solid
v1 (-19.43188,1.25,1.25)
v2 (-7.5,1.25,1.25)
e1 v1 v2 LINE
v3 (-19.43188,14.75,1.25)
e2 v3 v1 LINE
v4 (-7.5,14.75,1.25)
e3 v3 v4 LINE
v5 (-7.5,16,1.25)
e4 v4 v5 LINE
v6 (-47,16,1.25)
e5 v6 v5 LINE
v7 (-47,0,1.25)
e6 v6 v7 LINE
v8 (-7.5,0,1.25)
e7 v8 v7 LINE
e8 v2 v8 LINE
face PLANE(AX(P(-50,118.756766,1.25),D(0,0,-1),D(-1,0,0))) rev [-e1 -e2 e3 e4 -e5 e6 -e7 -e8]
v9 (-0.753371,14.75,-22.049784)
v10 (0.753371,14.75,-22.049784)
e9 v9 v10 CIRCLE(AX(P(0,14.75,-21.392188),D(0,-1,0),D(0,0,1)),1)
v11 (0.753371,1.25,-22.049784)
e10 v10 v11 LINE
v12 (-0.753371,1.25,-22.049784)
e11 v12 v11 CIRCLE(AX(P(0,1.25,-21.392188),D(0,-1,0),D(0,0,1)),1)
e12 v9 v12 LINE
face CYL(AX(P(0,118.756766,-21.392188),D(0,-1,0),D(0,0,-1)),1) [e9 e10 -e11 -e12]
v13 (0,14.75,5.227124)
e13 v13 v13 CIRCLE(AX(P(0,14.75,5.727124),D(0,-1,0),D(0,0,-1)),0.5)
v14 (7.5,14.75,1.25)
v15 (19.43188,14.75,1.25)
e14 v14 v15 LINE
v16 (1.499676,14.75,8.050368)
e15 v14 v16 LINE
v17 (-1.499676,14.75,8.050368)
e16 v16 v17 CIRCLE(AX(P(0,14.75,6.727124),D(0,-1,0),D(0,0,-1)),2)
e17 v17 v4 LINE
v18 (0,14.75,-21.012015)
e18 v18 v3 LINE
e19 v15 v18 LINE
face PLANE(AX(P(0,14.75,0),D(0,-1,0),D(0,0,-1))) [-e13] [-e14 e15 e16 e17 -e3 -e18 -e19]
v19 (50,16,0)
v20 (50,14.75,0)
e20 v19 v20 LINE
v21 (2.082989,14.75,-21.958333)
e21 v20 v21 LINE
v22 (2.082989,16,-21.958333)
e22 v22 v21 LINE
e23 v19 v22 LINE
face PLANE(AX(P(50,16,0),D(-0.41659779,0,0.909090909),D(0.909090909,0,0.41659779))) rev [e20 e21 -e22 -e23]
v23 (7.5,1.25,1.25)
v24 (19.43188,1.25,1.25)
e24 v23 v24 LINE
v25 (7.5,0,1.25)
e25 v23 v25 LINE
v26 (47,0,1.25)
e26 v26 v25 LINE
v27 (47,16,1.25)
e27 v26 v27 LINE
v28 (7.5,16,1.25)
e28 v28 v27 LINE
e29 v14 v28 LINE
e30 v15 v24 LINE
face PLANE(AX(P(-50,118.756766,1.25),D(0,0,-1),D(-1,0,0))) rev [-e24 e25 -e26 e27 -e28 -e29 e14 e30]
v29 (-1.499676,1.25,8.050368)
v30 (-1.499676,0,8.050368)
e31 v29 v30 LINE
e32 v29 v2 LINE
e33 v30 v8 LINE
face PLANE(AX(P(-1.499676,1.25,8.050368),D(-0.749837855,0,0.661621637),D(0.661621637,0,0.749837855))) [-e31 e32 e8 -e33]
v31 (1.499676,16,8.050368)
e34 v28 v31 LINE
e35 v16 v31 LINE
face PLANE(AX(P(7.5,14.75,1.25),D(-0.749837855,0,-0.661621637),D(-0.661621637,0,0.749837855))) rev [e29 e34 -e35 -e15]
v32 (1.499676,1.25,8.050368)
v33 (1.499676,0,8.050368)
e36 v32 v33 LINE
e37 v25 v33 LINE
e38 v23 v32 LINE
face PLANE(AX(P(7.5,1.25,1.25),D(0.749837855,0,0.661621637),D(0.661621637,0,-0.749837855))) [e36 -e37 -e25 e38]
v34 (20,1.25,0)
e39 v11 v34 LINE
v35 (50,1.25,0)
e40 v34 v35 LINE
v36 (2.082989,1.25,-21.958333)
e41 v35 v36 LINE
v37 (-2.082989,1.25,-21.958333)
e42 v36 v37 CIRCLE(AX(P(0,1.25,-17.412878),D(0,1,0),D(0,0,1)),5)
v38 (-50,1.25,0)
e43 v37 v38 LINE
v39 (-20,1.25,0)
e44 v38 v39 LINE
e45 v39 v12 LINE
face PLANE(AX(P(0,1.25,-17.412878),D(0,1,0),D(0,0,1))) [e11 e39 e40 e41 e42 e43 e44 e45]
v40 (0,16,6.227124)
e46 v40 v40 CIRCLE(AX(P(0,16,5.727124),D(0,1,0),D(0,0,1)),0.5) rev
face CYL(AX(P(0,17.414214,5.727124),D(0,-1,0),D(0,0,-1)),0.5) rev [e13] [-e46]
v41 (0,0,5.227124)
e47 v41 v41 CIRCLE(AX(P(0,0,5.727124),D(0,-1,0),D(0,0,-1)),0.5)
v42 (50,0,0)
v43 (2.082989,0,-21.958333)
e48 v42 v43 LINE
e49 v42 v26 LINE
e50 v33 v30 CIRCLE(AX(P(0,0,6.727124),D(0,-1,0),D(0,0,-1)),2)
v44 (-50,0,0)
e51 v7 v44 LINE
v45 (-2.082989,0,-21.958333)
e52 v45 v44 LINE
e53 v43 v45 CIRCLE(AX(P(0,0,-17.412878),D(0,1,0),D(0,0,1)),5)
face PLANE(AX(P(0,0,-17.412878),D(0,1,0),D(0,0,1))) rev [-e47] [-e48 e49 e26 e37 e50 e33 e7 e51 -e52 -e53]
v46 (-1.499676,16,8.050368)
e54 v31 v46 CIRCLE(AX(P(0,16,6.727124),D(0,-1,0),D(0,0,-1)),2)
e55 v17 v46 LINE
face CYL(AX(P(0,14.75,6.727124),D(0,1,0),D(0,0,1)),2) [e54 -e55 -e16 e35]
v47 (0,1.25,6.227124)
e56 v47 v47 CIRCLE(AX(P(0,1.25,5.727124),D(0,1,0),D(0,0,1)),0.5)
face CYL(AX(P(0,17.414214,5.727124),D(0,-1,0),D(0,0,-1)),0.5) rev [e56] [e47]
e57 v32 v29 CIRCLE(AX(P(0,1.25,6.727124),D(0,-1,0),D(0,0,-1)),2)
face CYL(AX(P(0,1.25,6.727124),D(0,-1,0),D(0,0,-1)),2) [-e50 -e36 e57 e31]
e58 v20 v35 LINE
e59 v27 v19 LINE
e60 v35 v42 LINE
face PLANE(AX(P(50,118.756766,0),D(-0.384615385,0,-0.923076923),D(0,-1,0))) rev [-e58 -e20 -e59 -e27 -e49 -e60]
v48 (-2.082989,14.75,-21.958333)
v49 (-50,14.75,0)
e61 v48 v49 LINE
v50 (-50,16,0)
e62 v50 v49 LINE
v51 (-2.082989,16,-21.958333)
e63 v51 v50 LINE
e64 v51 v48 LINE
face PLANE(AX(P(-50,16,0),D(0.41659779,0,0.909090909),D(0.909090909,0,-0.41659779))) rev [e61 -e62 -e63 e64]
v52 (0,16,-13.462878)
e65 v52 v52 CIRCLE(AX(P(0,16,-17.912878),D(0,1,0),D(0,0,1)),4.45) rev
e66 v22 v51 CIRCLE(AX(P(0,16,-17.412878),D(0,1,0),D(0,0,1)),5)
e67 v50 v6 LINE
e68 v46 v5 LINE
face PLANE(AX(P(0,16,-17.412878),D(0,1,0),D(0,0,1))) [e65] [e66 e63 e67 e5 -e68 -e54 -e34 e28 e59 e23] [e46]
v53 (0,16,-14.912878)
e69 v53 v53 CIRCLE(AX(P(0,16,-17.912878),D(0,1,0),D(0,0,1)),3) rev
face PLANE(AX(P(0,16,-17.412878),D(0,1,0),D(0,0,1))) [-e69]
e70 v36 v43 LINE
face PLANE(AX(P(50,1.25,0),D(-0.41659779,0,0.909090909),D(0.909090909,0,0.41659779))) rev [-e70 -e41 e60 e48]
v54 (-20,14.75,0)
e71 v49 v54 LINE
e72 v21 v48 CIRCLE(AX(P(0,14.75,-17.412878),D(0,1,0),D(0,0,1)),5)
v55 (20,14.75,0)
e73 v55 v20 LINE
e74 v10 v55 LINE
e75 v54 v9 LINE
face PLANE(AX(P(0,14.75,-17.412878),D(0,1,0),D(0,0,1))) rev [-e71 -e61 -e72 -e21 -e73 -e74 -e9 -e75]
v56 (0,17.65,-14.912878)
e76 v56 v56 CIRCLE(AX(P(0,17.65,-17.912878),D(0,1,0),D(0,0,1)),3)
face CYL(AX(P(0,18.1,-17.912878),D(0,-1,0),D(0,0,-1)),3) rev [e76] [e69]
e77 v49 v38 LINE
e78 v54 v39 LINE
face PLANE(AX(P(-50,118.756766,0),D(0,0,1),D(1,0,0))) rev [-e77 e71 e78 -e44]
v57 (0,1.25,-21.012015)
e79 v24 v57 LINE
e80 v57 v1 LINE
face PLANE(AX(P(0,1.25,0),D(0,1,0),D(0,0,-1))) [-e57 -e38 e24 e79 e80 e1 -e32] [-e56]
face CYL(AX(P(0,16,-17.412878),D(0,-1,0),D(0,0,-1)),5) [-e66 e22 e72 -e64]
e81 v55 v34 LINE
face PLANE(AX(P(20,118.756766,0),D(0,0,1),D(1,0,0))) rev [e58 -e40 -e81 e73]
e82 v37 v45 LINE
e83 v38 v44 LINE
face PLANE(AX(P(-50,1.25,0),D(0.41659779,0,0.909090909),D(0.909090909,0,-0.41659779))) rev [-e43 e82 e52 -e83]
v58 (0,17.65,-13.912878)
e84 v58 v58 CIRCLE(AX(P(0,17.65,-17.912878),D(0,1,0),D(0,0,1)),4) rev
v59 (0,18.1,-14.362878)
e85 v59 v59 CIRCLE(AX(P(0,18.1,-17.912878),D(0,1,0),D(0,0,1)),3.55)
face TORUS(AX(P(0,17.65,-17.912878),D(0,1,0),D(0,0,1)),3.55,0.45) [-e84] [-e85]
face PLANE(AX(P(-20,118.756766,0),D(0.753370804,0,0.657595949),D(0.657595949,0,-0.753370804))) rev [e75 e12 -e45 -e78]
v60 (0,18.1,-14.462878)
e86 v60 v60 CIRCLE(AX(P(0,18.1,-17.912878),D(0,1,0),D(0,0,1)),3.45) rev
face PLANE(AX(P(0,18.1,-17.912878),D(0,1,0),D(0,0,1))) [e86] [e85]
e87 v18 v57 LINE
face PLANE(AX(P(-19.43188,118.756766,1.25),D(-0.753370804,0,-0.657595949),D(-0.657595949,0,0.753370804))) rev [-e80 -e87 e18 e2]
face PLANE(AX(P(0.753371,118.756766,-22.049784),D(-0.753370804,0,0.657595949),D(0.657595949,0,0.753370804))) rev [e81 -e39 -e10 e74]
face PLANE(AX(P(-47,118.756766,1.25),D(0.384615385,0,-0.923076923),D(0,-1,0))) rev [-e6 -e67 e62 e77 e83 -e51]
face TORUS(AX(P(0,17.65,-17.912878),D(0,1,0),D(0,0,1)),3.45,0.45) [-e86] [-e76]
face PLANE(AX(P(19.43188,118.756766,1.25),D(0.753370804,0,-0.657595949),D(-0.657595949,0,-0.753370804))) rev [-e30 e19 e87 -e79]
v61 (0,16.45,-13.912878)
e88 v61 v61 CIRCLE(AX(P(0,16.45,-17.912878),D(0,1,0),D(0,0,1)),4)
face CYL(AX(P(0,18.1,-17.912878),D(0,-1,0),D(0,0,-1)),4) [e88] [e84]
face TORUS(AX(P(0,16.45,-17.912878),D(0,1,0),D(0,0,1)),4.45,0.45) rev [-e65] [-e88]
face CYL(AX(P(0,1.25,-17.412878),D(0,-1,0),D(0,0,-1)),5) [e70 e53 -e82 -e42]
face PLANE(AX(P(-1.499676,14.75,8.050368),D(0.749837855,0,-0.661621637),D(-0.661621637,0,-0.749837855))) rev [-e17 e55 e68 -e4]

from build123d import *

# Parameters (mm, degrees)
BOSS_EXTRUDE1_DEPTH          = 1.25
BOSS_EXTRUDE8_START          = -8
BOSS_EXTRUDE8_DEPTH          = 16
CHAMFER2_SIZE2               = 3
CHAMFER2_SIZE                = 1.25
CHAMFER3_SIZE2               = 3
CHAMFER3_SIZE                = 1.25
BOSS_EXTRUDE9_DEPTH          = 1.25
BOSS_EXTRUDE10_DEPTH         = 1.25
CUT_EXTRUDE1_REACH           = 59.082
SKETCH6_R                    = 0.5
SCHIZZO1_R                   = 4
SCHIZZO1_R_2                 = 3
ESTRUSIONE_ESTRUSIONE1_DEPTH = 2.1
RACCORDO1_R                  = 0.45


with BuildPart() as part:
    # Sketch1 → Boss-Extrude1 (new body)
    with BuildSketch(Plane(origin=(0, 0, 0), x_dir=(1, 0, 0), z_dir=(0, 1, 0))):
        with BuildLine():
            Line((-50, 0), (-2.082988952, 21.95833302))
            ThreePointArc((-2.082988952, 21.95833302), (0, 22.412878475), (2.082988952, 21.95833302))
            Line((2.082988952, 21.95833302), (50, 0))
            Line((50, 0), (20, 0))
            Line((20, 0), (0.753370804, 22.049783791))
            ThreePointArc((0.753370804, 22.049783791), (0, 22.392187842), (-0.753370804, 22.049783791))
            Line((-0.753370804, 22.049783791), (-20, 0))
            Line((-20, 0), (-50, 0))
        make_face()
    extrude(amount=BOSS_EXTRUDE1_DEPTH)


with BuildPart() as body_2:
    # Body-Move/Copy1: copy of part
    add(part.part.moved(Location((0, 14.75, 0))))


with BuildPart() as part_1:
    add(part.part)

    add(body_2.part)  # Boss-Extrude8 merges body 2
    # Sketch3 → Boss-Extrude8 (add)
    with BuildSketch(Plane(origin=(0, 8, 0), x_dir=(1, 0, 0), z_dir=(0, 1, 0)).offset(BOSS_EXTRUDE8_START)):
        with BuildLine():
            Line((19.431879943, -1.25), (0, 21.012015184))
            Line((0, 21.012015184), (-19.431879943, -1.25))
            Line((-19.431879943, -1.25), (-50, -1.25))
            Line((-50, -1.25), (-50, 0))
            Line((-50, 0), (-20, 0))
            Line((-20, 0), (-0.753370804, 22.049783791))
            ThreePointArc((-0.753370804, 22.049783791), (0, 22.392187842), (0.753370804, 22.049783791))
            Line((0.753370804, 22.049783791), (20, 0))
            Line((20, 0), (50, 0))
            Line((50, 0), (50, -1.25))
            Line((50, -1.25), (19.431879943, -1.25))
        make_face()
    extrude(amount=BOSS_EXTRUDE8_DEPTH)

    # Chamfer2
    chamfer2_edges = [part_1.edges().sort_by_distance(p)[0] for p in [
        (50, 8, 1.25),
    ]]
    chamfer2_side = [part_1.faces().sort_by_distance(p)[0] for p in [
        (50, 8, 1.225),
    ]]
    chamfer(chamfer2_edges, length=CHAMFER2_SIZE - 0.0001, length2=CHAMFER2_SIZE2 - 0.0001, reference=chamfer2_side[0])  # a hair under: the kernel refuses the full size

    # Chamfer3
    chamfer3_edges = [part_1.edges().sort_by_distance(p)[0] for p in [
        (-50, 8, 1.25),
    ]]
    chamfer3_side = [part_1.faces().sort_by_distance(p)[0] for p in [
        (-50, 8, 1.225),
    ]]
    chamfer(chamfer3_edges, length=CHAMFER3_SIZE - 0.0001, length2=CHAMFER3_SIZE2 - 0.0001, reference=chamfer3_side[0])  # a hair under: the kernel refuses the full size

    # Sketch4 → Boss-Extrude9 (add)
    with BuildSketch(Plane(origin=(0, 16, 0), x_dir=(1, 0, 0), z_dir=(0, 1, 0))):
        Polygon((-19.431879943, -1.25), (0, 21.012015184), (19.431879943, -1.25), align=None)
    boss_extrude9 = extrude(amount=-BOSS_EXTRUDE9_DEPTH)

    # Mirror1: Boss-Extrude9 across plane
    add(boss_extrude9.mirror(Plane.ZX.offset(8)))

    # Sketch5 → Boss-Extrude10 (add)
    with BuildSketch(Plane.XZ):
        with BuildLine():
            Line((-7.5, 1.25), (7.5, 1.25))
            Line((7.5, 1.25), (1.499675711, 8.050367528))
            ThreePointArc((1.499675711, 8.050367528), (0, 8.727124254), (-1.499675711, 8.050367528))
            Line((-1.499675711, 8.050367528), (-7.5, 1.25))
        make_face()
    boss_extrude10 = extrude(amount=-BOSS_EXTRUDE10_DEPTH)

    # Mirror2: Boss-Extrude10 across plane
    add(boss_extrude10.mirror(Plane.ZX.offset(8)))

    # Sketch6 → Cut-Extrude1 (cut, up to next)
    with BuildSketch(Plane(origin=(0, 0, 0), x_dir=(-1, 0, 0), z_dir=(0, -1, 0)), mode=Mode.PRIVATE) as cut_extrude1_sk1:
        with Locations(Location((0, -5.727124254, 0), (0, 0, 90))):
            Circle(SKETCH6_R)
    cut_extrude1_tool1 = extrude(cut_extrude1_sk1.sketch, amount=-CUT_EXTRUDE1_REACH, mode=Mode.PRIVATE) & part_1.part
    add(cut_extrude1_tool1.solids().sort_by_distance((0, 0, 5.727124))[0], mode=Mode.SUBTRACT)
    add(cut_extrude1_tool1.solids().sort_by_distance((0, 0, 5.727124))[1], mode=Mode.SUBTRACT)

    # Schizzo1 → Estrusione-Estrusione1 (add)
    with BuildSketch(Plane(origin=(0, 16, 0), x_dir=(1, 0, 0), z_dir=(0, 1, 0))):
        with Locations(Location((0, 17.912878475, 0), (0, 0, 270))):
            Circle(SCHIZZO1_R)
        with Locations(Location((0, 17.912878475, 0), (0, 0, 270))):
            Circle(SCHIZZO1_R_2, mode=Mode.SUBTRACT)
    extrude(amount=ESTRUSIONE_ESTRUSIONE1_DEPTH)

    # Raccordo1
    raccordo1_edges = [part_1.edges().sort_by_distance(p)[0] for p in [
        (0, 18.1, -21.912878475),
        (0, 16, -21.912878475),
        (0, 18.1, -20.912878475),
    ]]
    fillet(raccordo1_edges, radius=RACCORDO1_R)


solid = part_1.part
